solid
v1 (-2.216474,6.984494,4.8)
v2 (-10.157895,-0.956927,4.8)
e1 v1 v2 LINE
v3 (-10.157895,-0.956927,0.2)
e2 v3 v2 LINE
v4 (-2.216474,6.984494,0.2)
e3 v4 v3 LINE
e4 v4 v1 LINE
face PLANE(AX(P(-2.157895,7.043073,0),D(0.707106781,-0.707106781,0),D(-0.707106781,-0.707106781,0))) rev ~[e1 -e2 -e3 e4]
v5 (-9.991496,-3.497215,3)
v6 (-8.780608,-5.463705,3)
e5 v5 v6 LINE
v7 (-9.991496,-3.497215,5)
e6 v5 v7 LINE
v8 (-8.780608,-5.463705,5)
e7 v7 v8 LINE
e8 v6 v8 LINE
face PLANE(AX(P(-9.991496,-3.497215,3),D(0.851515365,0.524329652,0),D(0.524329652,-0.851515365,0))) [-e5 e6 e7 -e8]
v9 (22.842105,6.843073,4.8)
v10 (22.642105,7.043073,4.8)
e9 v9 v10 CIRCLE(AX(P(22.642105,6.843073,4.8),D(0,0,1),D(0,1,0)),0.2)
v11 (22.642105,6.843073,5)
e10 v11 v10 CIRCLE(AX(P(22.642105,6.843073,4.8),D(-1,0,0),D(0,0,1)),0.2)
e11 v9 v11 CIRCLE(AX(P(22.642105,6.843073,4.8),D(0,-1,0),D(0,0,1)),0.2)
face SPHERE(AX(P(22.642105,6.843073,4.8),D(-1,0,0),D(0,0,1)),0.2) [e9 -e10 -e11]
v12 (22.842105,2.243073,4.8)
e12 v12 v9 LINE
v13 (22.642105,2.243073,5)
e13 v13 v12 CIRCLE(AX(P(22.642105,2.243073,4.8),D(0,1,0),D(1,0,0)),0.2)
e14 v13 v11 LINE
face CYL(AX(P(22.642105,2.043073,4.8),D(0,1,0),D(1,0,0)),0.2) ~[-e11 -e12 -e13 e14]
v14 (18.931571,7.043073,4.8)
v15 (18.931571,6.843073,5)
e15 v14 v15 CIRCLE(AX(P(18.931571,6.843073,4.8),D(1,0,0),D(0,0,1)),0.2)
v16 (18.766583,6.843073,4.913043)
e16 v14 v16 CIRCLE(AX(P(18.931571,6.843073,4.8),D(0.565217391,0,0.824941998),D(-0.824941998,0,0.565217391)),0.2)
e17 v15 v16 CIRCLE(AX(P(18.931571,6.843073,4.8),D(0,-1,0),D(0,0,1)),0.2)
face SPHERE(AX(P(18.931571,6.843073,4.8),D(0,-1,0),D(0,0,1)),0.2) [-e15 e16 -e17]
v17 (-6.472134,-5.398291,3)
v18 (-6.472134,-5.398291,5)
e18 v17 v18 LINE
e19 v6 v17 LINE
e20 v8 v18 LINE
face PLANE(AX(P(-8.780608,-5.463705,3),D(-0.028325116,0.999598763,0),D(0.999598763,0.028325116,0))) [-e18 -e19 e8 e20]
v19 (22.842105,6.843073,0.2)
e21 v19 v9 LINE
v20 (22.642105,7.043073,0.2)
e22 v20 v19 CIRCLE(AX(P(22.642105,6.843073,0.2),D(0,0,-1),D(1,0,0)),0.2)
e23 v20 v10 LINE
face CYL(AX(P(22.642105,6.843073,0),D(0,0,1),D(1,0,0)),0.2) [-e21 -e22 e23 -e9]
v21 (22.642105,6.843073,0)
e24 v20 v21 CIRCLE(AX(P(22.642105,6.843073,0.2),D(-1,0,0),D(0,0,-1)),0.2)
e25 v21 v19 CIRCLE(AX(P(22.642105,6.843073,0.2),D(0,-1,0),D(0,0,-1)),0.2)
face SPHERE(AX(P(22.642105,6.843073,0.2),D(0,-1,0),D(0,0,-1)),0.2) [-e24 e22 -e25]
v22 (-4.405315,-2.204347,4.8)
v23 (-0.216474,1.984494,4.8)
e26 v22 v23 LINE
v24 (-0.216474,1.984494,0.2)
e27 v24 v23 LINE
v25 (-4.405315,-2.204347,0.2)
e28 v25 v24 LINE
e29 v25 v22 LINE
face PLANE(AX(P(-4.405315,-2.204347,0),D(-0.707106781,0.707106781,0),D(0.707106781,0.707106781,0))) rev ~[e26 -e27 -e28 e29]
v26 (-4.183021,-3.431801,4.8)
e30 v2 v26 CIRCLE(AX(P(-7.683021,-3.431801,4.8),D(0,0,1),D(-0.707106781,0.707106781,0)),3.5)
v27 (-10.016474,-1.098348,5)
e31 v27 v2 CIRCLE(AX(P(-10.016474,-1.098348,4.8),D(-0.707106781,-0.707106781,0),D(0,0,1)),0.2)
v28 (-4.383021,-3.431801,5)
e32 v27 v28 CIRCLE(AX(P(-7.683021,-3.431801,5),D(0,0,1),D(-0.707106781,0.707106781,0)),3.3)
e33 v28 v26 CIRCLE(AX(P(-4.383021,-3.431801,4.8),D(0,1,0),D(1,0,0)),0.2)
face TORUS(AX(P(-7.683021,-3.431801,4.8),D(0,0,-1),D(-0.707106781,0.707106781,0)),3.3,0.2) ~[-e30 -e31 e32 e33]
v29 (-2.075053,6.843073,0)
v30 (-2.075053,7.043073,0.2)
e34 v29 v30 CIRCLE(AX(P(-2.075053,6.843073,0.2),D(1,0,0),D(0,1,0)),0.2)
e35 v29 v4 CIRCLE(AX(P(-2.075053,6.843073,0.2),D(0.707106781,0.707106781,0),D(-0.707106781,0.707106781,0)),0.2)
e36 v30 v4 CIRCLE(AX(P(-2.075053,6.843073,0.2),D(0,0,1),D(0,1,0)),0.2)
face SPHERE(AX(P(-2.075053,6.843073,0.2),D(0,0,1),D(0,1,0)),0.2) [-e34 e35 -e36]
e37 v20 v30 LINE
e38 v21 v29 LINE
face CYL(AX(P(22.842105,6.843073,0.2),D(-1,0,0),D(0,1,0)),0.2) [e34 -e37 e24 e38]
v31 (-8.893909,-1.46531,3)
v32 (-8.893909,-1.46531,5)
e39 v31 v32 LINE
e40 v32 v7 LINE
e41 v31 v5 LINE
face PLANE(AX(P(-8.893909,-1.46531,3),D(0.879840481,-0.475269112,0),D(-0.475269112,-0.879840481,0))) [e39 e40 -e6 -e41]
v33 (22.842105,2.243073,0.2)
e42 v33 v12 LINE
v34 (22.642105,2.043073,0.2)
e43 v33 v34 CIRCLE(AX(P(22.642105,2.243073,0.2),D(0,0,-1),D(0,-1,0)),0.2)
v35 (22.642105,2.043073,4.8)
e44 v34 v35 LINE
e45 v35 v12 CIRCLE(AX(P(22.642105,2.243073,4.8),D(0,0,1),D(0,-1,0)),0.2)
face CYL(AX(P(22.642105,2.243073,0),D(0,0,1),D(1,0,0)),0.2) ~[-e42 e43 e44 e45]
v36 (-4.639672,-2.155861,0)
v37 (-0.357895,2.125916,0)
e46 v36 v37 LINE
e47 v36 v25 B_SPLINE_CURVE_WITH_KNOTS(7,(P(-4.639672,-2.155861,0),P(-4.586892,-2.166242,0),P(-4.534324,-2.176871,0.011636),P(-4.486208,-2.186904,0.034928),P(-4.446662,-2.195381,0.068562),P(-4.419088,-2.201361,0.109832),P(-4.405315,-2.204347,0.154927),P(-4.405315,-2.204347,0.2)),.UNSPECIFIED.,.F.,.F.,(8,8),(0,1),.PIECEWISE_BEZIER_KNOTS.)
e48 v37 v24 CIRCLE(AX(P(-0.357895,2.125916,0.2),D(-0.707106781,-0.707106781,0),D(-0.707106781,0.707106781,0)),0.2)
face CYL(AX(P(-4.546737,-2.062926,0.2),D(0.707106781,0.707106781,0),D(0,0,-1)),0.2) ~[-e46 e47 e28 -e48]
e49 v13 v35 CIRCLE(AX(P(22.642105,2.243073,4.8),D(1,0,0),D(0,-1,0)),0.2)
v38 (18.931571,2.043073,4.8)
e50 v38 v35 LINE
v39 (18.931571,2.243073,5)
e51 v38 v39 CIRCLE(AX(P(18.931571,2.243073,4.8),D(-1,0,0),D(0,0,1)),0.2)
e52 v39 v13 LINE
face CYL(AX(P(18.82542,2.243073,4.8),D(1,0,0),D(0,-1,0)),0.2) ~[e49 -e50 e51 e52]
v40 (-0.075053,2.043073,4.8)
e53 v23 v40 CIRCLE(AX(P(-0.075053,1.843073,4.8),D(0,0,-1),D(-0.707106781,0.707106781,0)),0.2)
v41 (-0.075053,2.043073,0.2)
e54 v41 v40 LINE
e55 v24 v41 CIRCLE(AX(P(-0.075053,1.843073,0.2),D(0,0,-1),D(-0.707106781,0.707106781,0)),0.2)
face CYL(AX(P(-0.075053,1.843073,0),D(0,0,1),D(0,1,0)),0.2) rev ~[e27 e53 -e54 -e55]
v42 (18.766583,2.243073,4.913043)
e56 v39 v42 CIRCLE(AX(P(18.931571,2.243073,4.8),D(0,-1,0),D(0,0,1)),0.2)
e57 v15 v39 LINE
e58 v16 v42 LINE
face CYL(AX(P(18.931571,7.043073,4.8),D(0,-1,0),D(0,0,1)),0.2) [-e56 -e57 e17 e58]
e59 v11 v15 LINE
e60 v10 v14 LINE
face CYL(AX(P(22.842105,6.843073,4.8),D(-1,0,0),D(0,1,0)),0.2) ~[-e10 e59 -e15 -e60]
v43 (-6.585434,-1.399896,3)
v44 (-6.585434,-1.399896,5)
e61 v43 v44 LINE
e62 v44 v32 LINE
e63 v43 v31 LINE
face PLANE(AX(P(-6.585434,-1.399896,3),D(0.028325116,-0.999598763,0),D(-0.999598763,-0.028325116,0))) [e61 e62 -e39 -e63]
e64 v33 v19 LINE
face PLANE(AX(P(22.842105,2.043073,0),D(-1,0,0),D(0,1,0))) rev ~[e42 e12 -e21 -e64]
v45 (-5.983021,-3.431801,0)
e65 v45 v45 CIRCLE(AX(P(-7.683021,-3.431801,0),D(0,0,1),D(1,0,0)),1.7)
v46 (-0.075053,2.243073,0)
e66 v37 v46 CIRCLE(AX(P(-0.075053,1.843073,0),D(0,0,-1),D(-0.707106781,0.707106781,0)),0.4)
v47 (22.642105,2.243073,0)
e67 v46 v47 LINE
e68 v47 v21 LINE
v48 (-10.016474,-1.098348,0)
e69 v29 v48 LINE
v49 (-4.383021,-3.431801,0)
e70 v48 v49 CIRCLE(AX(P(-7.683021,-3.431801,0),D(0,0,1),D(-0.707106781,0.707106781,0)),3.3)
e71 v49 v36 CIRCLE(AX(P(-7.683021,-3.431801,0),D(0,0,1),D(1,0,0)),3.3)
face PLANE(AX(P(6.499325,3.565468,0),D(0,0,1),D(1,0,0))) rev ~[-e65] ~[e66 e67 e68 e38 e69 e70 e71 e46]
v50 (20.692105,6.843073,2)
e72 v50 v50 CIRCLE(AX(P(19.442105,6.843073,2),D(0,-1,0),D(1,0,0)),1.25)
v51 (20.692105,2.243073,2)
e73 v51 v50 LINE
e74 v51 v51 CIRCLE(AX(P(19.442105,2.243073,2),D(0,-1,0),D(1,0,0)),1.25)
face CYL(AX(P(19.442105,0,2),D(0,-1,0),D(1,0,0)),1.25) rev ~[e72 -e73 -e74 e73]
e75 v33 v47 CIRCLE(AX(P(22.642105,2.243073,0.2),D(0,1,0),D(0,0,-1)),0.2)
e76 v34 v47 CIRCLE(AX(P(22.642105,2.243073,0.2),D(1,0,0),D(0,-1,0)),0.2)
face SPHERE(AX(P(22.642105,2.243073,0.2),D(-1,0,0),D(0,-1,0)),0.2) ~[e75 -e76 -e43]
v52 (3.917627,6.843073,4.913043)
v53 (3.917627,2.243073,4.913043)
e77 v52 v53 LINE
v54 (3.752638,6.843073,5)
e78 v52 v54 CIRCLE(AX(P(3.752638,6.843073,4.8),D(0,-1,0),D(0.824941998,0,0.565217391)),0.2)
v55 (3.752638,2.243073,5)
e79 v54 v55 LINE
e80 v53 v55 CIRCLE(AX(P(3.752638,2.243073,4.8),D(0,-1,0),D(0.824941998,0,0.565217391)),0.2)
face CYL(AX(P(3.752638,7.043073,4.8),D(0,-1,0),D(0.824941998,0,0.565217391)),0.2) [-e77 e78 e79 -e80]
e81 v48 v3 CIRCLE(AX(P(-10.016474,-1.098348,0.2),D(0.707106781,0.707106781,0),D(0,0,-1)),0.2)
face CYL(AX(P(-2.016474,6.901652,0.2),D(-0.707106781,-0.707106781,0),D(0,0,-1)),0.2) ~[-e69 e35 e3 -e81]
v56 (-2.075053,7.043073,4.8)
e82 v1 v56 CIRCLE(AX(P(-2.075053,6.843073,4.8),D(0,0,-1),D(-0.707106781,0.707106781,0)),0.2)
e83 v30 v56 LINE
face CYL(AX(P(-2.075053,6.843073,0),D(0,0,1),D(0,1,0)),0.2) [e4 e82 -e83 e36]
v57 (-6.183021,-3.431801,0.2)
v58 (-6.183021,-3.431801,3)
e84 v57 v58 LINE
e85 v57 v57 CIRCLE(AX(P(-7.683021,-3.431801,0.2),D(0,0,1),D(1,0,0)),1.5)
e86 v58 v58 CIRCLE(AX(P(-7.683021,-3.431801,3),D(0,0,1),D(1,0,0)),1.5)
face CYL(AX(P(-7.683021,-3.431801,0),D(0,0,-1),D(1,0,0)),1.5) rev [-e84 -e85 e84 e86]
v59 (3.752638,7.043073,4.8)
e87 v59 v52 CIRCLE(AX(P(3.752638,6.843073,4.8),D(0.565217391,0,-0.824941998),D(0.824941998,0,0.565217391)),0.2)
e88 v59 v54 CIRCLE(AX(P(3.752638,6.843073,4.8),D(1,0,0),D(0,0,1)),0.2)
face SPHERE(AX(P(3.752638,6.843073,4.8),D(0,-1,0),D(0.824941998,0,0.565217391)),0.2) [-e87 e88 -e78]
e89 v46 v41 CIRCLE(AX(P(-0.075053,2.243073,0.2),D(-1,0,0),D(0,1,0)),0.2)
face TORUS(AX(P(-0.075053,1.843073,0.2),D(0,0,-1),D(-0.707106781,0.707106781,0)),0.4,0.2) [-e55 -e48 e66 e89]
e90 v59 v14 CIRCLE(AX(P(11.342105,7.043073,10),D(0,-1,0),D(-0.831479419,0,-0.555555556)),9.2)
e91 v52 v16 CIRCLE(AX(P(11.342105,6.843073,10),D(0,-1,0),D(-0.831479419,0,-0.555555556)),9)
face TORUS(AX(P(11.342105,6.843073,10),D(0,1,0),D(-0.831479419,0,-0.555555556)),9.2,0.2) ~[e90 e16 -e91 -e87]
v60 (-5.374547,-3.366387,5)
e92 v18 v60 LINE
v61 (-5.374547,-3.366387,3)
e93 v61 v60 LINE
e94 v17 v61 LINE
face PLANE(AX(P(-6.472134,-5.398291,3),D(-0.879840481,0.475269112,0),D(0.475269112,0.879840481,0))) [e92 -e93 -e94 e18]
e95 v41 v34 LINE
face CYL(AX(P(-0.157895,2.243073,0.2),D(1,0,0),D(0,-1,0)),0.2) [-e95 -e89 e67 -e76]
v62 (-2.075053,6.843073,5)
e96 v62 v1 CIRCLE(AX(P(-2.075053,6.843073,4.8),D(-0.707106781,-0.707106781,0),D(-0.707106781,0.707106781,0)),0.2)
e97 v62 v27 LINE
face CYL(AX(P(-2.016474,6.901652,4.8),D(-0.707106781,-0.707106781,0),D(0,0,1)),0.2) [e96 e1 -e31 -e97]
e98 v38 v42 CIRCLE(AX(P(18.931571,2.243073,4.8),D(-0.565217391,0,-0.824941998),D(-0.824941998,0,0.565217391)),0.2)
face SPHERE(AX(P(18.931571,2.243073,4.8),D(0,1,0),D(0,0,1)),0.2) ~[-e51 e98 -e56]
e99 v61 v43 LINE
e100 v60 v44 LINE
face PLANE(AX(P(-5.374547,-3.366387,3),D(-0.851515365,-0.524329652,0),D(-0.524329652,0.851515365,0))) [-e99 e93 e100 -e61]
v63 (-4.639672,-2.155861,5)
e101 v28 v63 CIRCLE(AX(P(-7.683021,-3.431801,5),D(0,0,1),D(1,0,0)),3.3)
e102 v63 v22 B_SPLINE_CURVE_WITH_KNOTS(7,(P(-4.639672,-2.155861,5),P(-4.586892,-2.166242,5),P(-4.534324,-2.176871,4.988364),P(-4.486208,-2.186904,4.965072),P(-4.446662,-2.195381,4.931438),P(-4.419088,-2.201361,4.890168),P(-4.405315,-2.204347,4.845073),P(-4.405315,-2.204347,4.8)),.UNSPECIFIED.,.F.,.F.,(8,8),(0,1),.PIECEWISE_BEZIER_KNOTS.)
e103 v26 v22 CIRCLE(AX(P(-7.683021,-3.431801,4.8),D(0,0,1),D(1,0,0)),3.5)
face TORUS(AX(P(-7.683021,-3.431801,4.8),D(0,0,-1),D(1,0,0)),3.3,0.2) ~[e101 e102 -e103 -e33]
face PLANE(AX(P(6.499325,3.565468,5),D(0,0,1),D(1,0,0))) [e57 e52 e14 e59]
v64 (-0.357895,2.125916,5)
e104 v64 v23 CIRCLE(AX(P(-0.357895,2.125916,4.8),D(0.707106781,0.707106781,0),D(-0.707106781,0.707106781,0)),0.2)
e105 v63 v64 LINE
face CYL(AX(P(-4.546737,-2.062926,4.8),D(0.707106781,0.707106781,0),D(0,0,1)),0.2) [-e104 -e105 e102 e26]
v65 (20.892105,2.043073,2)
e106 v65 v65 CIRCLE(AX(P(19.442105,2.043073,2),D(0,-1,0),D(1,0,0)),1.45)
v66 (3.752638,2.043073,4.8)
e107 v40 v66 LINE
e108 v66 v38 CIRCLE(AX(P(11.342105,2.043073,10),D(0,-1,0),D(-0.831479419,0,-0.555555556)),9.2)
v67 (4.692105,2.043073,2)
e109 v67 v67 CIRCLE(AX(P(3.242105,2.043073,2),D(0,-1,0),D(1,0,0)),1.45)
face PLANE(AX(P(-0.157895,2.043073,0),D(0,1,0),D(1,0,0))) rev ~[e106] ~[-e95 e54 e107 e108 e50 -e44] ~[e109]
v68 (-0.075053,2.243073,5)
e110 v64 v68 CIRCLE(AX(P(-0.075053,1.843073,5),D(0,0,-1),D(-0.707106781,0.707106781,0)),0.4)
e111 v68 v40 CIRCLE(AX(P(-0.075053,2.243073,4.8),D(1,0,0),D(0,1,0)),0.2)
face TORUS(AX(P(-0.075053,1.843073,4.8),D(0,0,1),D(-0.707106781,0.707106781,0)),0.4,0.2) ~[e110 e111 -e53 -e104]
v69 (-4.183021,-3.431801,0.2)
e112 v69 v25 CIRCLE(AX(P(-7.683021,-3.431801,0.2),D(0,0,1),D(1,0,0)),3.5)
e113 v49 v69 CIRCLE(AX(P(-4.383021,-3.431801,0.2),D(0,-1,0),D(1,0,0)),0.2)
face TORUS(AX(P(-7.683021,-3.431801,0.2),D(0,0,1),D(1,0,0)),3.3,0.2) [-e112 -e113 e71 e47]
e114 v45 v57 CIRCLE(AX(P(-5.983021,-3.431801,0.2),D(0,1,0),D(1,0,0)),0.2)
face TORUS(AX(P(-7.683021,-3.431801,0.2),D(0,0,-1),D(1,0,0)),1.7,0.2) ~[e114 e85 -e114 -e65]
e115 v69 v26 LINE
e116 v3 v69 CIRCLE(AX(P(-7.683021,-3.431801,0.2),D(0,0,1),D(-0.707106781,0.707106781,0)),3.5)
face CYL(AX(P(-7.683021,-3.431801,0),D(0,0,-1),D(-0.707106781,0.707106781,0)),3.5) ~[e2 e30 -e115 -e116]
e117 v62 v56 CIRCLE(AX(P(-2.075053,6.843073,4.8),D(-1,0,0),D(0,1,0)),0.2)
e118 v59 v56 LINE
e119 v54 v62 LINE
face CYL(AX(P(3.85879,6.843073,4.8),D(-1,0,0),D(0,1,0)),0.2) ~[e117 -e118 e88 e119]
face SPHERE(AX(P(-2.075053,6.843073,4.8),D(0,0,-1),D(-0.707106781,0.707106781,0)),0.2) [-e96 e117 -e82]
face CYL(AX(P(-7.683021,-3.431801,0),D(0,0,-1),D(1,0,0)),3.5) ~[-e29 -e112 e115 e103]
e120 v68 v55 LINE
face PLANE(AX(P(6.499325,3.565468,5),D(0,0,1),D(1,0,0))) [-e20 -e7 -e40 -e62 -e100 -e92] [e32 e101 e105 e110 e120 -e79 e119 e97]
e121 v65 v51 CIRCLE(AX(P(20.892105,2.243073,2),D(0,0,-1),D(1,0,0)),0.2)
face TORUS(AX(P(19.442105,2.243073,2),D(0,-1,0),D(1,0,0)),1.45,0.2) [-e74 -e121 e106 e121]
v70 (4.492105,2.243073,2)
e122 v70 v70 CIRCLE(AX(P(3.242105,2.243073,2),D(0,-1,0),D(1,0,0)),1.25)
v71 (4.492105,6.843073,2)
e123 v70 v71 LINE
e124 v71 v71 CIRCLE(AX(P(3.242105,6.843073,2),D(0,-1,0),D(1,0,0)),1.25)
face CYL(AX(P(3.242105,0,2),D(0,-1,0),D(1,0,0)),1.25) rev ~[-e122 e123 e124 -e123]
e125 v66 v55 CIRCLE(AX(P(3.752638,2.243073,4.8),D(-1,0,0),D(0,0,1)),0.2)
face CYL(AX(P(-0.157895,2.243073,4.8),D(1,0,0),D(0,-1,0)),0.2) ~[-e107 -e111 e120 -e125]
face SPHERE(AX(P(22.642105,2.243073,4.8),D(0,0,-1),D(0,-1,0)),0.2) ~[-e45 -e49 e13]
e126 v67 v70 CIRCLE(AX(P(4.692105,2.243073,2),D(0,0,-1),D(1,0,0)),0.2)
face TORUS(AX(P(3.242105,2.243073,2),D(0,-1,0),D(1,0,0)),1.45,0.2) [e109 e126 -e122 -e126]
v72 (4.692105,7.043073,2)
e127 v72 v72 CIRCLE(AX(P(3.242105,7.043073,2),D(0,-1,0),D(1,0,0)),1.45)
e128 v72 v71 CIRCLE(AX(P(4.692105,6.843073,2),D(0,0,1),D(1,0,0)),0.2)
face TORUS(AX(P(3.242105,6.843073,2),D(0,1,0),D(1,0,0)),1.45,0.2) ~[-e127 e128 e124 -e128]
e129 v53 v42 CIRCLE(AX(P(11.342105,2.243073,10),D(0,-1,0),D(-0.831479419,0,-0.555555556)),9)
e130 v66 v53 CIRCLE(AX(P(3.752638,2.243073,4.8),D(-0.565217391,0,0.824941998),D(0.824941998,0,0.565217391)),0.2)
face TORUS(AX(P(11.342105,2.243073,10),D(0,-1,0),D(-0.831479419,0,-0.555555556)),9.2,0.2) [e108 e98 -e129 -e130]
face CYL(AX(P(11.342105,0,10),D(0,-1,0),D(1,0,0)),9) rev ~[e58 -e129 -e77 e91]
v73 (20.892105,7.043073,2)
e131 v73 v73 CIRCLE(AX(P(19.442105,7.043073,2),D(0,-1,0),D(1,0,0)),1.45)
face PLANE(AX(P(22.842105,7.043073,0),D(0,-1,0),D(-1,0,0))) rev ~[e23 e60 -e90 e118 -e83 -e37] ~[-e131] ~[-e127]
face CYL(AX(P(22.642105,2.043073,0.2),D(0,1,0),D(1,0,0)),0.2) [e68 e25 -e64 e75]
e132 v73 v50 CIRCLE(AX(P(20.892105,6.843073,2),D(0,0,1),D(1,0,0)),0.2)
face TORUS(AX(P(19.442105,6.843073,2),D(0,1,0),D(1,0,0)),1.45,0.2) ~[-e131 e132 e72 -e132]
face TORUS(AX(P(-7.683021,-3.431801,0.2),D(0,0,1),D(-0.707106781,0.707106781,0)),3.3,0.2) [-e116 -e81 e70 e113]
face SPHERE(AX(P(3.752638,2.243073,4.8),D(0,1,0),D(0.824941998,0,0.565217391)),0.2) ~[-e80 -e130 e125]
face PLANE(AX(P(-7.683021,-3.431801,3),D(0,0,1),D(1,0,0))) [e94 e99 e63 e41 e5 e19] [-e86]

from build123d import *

# Parameters (mm, degrees)
F0_R     = 1.5
F1_DEPTH = 5
F2_R     = 9
F2_R_2   = 1.25
F3_DEPTH = 15
F4_R     = 0.2
F5_START = 3
F5_DEPTH = 2


# Not quite as in the source:
# - a feature names something its author has since deleted; it is built from what else it names


with BuildPart() as f1:
    # F0 (on Top) → F1 (new body)
    with BuildSketch(Plane.XY):
        with BuildLine():
            Line((22.8421047838, 2.0430730569), (22.8421047838, 7.0430730569))
            Line((22.8421047838, 7.0430730569), (-2.1578952162, 7.0430730569))
            Line((-2.1578952162, 7.0430730569), (-10.1578952162, -0.9569269431))
            ThreePointArc((-10.1578952162, -0.9569269431), (-6.9413010441, -0.0112962127), (-4.4053153311, -2.2043470579))
            Line((-4.4053153311, -2.2043470579), (-0.1578952162, 2.0430730569))
            Line((-0.1578952162, 2.0430730569), (22.8421047838, 2.0430730569))
        make_face()
        with BuildLine():
            ThreePointArc((-4.4053153311, -2.2043470579), (-6.9413010441, -0.0112962127), (-10.1578952162, -0.9569269431))
            ThreePointArc((-10.1578952162, -0.9569269431), (-9.0224134954, -6.665379041), (-4.1830214821, -3.4318006772))
            ThreePointArc((-4.1830214821, -3.4318006772), (-4.2390432934, -2.8080906198), (-4.4053153311, -2.2043470579))
        make_face()
        Polygon((-6.5854344834, -1.3998961239), (-5.3745470215, -3.3663866243), (-6.4721340202, -5.3982911776), (-8.7806084808, -5.4637052305), (-9.9914959426, -3.4972147302), (-8.893908944, -1.4653101769), align=None, mode=Mode.SUBTRACT)
        Polygon((-6.4721340202, -5.3982911776), (-5.3745470215, -3.3663866243), (-6.5854344834, -1.3998961239), (-8.893908944, -1.4653101769), (-9.9914959426, -3.4972147302), (-8.7806084808, -5.4637052305), align=None)
        with Locations((-7.6830214821, -3.4318006772)):
            Circle(F0_R, mode=Mode.SUBTRACT)
    extrude(amount=F1_DEPTH)

    # F2 (on Front) → F3 (cut)
    with BuildSketch(Plane.XZ):
        with Locations((11.3421047838, 10)):
            Circle(F2_R)
        with Locations((19.4421047838, 2)):
            Circle(F2_R_2)
        with Locations((3.2421047838, 2)):
            Circle(F2_R_2)
    extrude(amount=-F3_DEPTH, mode=Mode.SUBTRACT)

    # F4
    f4_edges = [f1.edges().sort_by_distance(p)[0] for p in [
        (20.833762, 7.043073, 5),
        (11.342105, 7.043073, 1),
        (11.342105, 2.043073, 0),
        (22.842105, 2.043073, 2.5),
        (20.833762, 2.043073, 5),
        (11.342105, 2.043073, 1),
        (1.850447, 2.043073, 5),
        (-0.157895, 2.043073, 2.5),
        (1.992105, 2.043073, 2),
        (18.192105, 2.043073, 2),
        (-6.183021, -3.431801, 2.5),
        (-9.183021, -3.431801, 0),
        (-9.183021, -3.431801, 5),
        (22.842105, 4.543073, 5),
        (-2.281605, -0.080637, 5),
        (-8.424742, -6.852305, 5),
        (-6.157895, 3.043073, 5),
        (0.850447, 7.043073, 5),
        (3.85879, 4.543073, 5),
        (22.842105, 4.543073, 0),
        (10.342105, 7.043073, 0),
        (-6.157895, 3.043073, 0),
        (-8.424742, -6.852305, 0),
        (-2.281605, -0.080637, 0),
        (18.82542, 4.543073, 5),
        (20.692105, 4.543073, 2),
        (18.192105, 7.043073, 2),
        (22.842105, 7.043073, 2.5),
        (-2.157895, 7.043073, 2.5),
        (1.992105, 7.043073, 2),
        (4.492105, 4.543073, 2),
    ]]
    fillet(f4_edges, radius=F4_R)

    # F0 (on Top) → F5 (cut)
    with BuildSketch(Plane.XY.offset(F5_START)):
        Polygon((-6.4721340202, -5.3982911776), (-5.3745470215, -3.3663866243), (-6.5854344834, -1.3998961239), (-8.893908944, -1.4653101769), (-9.9914959426, -3.4972147302), (-8.7806084808, -5.4637052305), align=None)
        with Locations((-7.6830214821, -3.4318006772)):
            Circle(F0_R, mode=Mode.SUBTRACT)
    extrude(amount=F5_DEPTH, mode=Mode.SUBTRACT)


solid = f1.part
